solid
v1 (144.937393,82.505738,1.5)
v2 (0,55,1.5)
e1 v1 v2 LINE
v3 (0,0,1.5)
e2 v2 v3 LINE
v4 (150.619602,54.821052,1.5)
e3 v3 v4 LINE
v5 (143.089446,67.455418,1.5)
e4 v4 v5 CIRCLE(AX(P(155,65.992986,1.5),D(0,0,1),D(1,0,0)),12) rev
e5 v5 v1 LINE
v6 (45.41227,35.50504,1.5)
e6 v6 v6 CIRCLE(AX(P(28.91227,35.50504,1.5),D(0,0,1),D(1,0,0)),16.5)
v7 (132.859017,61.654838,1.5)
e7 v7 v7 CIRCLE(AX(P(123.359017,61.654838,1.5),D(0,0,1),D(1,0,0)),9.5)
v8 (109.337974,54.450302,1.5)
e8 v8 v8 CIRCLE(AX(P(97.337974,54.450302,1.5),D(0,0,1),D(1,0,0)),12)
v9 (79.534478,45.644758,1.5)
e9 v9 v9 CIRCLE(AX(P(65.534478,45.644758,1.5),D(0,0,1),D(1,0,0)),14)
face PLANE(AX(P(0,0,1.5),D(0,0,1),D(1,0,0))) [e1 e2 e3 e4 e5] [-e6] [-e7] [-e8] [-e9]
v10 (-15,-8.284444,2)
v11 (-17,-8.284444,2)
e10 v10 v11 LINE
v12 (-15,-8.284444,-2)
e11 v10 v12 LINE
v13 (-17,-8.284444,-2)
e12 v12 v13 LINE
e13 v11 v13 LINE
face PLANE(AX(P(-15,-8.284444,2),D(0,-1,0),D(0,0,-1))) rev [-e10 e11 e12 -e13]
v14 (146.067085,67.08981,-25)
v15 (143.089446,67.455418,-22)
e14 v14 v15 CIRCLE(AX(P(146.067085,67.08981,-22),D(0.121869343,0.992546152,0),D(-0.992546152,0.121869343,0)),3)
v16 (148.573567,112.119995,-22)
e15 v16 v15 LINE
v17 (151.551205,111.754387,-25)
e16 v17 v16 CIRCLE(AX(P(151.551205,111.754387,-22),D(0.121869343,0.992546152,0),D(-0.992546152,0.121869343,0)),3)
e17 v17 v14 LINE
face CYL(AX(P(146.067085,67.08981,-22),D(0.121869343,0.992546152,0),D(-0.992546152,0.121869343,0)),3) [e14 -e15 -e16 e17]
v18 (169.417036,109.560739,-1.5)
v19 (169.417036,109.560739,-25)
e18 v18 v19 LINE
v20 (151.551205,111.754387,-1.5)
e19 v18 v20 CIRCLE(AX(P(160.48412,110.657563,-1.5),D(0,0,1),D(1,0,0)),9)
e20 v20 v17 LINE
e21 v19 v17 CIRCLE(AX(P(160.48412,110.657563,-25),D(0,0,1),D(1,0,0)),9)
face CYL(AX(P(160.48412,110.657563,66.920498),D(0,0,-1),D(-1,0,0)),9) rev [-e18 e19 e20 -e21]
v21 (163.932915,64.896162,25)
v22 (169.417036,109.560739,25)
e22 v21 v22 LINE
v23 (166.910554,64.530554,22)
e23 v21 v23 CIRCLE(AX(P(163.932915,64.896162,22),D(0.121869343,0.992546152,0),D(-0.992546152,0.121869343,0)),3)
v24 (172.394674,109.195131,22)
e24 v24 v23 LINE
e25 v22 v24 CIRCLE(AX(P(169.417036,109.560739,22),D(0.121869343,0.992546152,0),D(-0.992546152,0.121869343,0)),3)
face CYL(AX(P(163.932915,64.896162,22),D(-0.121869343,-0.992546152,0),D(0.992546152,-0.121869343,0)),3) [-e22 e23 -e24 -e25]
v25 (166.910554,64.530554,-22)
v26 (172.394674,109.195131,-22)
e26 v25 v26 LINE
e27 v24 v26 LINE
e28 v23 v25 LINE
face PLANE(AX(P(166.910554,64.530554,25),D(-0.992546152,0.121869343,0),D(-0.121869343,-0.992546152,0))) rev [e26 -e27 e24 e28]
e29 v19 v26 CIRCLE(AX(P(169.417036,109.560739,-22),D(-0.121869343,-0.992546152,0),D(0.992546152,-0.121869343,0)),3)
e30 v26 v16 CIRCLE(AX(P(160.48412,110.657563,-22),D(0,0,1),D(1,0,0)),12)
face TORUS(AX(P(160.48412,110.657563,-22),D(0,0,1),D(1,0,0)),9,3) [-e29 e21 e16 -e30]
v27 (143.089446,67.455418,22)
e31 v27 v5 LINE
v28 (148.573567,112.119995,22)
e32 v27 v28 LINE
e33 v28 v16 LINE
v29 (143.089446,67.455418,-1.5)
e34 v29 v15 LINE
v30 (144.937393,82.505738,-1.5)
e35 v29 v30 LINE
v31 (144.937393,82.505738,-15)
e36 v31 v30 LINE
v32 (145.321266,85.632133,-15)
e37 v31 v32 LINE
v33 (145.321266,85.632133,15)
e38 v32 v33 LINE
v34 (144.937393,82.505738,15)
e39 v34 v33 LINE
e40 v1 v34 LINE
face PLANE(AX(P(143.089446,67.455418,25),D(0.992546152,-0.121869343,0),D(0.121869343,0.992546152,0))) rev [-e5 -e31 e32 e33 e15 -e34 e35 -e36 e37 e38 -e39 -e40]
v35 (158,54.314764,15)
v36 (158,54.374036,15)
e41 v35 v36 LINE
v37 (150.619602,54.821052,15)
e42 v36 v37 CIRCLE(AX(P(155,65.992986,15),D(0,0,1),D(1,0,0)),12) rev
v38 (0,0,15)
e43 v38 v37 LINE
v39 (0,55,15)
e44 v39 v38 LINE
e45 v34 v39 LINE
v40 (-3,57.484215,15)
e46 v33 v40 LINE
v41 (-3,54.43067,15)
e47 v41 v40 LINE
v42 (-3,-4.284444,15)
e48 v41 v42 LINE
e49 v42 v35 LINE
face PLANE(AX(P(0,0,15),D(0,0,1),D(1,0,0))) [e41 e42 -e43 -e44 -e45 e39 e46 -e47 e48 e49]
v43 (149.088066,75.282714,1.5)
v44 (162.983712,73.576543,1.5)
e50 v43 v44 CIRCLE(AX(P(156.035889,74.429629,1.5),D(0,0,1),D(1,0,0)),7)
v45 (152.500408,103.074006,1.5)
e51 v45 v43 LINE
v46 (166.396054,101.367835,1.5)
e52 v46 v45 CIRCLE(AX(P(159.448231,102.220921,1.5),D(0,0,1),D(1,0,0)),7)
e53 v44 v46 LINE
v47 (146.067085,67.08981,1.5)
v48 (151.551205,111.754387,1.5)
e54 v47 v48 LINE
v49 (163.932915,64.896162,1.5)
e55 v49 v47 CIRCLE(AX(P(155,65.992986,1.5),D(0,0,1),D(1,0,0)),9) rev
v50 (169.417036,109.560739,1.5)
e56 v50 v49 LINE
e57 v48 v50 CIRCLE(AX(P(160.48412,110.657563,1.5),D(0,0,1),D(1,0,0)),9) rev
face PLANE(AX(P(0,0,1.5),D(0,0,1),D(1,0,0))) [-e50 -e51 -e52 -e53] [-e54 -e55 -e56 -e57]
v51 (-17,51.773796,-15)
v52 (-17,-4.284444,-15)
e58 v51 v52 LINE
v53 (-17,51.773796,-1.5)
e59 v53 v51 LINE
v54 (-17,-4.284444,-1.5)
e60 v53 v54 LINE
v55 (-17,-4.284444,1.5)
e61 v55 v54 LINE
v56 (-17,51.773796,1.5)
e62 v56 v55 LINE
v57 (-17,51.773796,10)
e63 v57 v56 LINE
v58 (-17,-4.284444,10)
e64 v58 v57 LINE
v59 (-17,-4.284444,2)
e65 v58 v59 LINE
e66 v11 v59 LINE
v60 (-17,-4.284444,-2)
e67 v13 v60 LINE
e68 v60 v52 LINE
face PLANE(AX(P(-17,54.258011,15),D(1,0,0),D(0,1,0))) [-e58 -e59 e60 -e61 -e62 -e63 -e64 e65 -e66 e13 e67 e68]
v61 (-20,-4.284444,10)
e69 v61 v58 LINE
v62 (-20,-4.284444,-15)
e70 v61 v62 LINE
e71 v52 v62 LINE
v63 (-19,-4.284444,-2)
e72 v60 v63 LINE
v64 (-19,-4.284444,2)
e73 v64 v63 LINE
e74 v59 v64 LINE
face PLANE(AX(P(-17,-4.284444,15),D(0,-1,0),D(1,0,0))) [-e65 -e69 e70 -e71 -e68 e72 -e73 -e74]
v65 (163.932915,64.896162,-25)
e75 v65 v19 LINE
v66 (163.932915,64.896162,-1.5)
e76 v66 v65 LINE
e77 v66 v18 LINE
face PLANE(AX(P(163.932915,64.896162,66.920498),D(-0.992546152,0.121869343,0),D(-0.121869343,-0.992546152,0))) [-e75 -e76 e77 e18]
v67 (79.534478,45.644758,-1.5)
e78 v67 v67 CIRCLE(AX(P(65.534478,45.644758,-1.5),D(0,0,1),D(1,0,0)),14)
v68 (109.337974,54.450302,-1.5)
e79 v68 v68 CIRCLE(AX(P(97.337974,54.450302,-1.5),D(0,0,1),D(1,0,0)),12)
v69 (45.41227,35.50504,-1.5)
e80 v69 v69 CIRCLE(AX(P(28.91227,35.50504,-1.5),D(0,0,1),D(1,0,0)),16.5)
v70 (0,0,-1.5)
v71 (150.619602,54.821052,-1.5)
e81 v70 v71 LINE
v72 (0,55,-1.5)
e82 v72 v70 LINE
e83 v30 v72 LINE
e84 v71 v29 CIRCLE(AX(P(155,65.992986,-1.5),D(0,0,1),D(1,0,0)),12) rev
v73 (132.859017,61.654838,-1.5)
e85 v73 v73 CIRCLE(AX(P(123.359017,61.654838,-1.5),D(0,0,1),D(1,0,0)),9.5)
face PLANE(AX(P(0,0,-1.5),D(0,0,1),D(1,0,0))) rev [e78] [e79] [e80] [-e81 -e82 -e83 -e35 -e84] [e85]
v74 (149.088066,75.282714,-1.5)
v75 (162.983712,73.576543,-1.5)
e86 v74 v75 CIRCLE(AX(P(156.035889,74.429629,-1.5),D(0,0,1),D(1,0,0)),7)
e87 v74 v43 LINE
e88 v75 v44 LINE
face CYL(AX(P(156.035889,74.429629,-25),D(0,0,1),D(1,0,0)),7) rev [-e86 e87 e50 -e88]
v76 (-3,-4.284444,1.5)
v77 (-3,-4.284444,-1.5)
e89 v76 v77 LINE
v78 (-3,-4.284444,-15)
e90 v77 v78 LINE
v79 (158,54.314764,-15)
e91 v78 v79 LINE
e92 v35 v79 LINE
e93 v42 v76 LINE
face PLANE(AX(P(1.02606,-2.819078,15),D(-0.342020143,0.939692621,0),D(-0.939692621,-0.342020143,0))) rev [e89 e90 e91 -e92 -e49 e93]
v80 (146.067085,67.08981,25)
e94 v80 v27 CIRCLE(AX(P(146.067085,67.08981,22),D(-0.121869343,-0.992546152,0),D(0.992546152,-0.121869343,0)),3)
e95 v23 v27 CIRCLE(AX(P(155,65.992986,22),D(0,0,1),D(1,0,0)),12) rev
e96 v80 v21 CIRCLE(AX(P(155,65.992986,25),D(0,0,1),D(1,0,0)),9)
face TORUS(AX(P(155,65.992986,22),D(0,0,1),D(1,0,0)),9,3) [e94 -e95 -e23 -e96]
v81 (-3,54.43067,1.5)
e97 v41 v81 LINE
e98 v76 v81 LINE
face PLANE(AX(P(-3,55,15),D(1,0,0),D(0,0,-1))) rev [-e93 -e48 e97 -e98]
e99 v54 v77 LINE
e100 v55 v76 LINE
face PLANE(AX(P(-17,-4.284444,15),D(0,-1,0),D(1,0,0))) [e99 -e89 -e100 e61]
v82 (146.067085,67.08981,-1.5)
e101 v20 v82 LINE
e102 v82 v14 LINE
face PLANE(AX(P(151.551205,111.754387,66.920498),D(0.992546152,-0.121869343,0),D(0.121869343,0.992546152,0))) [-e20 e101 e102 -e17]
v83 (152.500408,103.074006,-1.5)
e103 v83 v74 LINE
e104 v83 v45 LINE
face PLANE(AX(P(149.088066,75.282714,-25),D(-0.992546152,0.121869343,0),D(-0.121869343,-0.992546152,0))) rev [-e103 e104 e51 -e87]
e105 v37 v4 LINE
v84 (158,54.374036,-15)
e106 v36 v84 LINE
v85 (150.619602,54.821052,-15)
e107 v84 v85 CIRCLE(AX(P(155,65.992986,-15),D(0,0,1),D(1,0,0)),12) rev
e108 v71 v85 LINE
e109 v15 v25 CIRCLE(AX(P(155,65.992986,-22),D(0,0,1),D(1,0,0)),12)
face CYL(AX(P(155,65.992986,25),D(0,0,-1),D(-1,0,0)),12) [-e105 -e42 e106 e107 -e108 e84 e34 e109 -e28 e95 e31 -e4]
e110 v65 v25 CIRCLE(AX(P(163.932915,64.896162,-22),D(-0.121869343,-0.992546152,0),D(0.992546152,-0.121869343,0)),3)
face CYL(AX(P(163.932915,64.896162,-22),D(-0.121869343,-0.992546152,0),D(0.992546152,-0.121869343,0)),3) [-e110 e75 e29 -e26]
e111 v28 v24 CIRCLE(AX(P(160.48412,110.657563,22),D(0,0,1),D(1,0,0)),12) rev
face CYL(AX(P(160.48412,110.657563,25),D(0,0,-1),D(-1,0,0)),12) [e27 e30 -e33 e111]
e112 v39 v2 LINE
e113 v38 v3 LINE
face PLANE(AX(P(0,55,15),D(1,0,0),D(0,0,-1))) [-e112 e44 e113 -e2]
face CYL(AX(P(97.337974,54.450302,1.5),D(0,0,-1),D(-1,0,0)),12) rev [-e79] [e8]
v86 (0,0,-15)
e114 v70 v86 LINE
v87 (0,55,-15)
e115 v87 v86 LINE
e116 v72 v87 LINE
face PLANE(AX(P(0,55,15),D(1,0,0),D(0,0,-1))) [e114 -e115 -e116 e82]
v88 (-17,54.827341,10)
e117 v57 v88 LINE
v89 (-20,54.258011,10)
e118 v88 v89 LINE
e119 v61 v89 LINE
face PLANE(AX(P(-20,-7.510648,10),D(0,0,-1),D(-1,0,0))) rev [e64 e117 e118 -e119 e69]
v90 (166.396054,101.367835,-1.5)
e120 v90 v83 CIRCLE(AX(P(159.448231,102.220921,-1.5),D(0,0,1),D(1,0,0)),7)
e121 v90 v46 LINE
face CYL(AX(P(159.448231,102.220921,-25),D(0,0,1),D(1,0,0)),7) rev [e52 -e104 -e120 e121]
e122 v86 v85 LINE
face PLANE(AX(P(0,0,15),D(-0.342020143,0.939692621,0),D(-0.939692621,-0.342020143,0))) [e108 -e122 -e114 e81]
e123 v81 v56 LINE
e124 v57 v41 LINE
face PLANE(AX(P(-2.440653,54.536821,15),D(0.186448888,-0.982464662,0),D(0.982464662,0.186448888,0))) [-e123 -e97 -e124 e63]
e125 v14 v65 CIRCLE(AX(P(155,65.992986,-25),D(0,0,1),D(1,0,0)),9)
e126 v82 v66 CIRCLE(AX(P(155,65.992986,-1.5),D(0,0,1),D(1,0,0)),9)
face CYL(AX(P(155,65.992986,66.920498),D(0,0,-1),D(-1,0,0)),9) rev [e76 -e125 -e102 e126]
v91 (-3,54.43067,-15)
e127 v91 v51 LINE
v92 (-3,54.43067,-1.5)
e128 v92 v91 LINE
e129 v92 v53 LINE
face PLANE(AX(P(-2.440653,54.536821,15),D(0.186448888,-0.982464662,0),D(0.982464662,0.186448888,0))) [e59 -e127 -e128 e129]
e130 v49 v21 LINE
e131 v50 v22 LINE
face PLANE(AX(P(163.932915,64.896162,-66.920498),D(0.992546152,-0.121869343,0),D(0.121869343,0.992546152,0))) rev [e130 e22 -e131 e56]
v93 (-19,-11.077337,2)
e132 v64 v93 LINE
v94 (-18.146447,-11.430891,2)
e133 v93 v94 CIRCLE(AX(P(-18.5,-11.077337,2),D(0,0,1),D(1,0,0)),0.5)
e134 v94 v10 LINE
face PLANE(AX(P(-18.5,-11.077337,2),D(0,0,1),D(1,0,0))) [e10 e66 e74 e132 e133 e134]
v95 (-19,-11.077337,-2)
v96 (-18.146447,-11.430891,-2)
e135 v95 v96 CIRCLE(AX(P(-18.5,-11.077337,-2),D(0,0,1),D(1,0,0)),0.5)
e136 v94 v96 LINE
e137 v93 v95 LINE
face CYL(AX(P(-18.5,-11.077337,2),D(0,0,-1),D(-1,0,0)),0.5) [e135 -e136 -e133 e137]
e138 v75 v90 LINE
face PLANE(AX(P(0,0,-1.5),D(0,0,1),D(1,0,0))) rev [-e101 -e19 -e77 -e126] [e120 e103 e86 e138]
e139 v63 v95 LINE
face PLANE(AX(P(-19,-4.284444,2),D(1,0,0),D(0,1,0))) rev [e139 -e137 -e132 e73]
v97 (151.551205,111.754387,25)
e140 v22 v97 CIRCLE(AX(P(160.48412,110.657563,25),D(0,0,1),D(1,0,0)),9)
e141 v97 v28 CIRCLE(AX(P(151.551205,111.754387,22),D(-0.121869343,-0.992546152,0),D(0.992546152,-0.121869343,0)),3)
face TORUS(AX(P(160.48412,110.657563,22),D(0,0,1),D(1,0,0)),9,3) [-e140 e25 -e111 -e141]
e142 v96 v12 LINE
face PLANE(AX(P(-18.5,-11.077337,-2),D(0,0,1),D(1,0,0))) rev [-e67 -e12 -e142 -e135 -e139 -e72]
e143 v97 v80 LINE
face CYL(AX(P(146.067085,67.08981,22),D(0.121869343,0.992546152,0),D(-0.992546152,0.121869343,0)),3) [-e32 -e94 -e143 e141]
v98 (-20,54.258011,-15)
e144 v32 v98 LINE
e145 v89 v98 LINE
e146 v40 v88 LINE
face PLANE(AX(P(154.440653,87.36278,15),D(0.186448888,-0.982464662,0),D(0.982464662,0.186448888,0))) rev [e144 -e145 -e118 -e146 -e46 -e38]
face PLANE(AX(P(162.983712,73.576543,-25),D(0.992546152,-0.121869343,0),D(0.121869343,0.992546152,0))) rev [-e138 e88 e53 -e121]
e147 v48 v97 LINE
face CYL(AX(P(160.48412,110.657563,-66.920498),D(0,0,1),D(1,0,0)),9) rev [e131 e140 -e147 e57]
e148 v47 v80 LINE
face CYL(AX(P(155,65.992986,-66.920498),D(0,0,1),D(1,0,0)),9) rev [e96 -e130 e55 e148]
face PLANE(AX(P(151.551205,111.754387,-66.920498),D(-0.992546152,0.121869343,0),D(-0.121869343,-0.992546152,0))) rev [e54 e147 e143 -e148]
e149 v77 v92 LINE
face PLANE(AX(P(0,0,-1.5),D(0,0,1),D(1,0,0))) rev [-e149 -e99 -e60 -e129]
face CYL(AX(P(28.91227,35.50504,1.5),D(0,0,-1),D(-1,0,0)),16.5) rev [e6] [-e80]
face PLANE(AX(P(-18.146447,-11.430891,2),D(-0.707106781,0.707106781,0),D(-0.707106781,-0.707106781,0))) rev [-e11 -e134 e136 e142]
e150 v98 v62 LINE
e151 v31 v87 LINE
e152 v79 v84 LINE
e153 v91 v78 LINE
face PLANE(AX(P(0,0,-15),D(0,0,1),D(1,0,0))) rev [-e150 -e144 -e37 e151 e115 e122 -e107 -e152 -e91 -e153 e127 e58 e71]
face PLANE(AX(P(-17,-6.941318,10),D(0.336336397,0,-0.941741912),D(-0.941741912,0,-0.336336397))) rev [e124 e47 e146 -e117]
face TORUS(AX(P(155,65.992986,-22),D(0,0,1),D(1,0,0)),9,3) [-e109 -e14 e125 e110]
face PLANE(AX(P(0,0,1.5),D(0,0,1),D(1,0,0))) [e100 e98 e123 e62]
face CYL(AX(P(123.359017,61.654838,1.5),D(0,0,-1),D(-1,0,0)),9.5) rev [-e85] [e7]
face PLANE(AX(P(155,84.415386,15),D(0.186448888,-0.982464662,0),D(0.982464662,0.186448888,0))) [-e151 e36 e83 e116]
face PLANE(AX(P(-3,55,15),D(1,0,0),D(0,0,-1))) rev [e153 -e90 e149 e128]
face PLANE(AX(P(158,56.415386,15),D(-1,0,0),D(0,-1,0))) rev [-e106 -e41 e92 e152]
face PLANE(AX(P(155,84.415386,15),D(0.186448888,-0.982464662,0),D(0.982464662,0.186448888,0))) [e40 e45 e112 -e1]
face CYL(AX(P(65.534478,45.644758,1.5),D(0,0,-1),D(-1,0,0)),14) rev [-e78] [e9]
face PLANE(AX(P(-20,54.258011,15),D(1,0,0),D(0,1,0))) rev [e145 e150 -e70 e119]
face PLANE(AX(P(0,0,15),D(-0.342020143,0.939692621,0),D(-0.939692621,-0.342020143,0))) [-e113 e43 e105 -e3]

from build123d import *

# Parameters (mm, degrees)
SCHIZZO1_R                    = 16.5
SCHIZZO1_R_2                  = 14
SCHIZZO1_R_3                  = 12
SCHIZZO1_R_4                  = 9.5
ESTRUSIONE_ESTRUSIONE1_DEPTH  = 1.5
ESTRUSIONE_SOTTILE4_DEPTH     = 15
ESTRUSIONE_ESTRUSIONE2_DEPTH  = 25
TAGLIO_ESTRUSIONE1_DEPTH      = 23.5
TAGLIO_ESTRUSIONE2_DEPTH      = 214.121208684
TAGLIO_ESTRUSIONE2_DEPTH_BACK = 214.121208684
ESTRUSIONE_SOTTILE5_DEPTH     = 15
ESTRUSIONE_ESTRUSIONE3_DEPTH  = 1.5
TAGLIO_ESTRUSIONE4_START      = -4.28444402
TAGLIO_ESTRUSIONE4_DEPTH      = 61.768658905
ESTRUSIONE_ESTRUSIONE5_DEPTH  = 2
RACCORDO4_R                   = 3
RACCORDO5_R                   = 3


# Read off the part's stored shape, not the designer's step: Taglio-Estrusione4
with BuildPart() as part:
    # Schizzo1 → Estrusione-Estrusione1 (new, symmetric)
    with BuildSketch(Plane.XY):
        Polygon((0, 55), (0, 0), (155, 56.415386311), (155, 84.415386311), align=None)
        with Locations((28.912269587, 35.505040119)):
            Circle(SCHIZZO1_R, mode=Mode.SUBTRACT)
        with Locations((65.534477731, 45.644757604)):
            Circle(SCHIZZO1_R_2, mode=Mode.SUBTRACT)
        with Locations((97.337974277, 54.450301735)):
            Circle(SCHIZZO1_R_3, mode=Mode.SUBTRACT)
        with Locations((123.359016906, 61.654837842)):
            Circle(SCHIZZO1_R_4, mode=Mode.SUBTRACT)
    extrude(amount=ESTRUSIONE_ESTRUSIONE1_DEPTH, both=True)

    # Schizzo5 → Estrusione-Sottile4 (add, symmetric)
    with BuildSketch(Plane.XY):
        Polygon((158, 88.038261311), (-3, 57.484214885), (-3, -4.28444402), (158, 54.314763697), align=None)
        Polygon((155, 84.415386311), (0, 55), (0, 0), (155, 56.415386311), align=None, mode=Mode.SUBTRACT)
    extrude(amount=ESTRUSIONE_SOTTILE4_DEPTH, both=True)

    # Schizzo6 → Estrusione-Estrusione2 (add, symmetric)
    with BuildSketch(Plane.XY):
        with BuildLine():
            Line((143.08944618, 67.455418384), (148.573566634, 112.119995208))
            ThreePointArc((148.573566634, 112.119995208), (161.946552574, 122.568116907), (172.394674273, 109.195130967))
            Line((172.394674273, 109.195130967), (166.91055382, 64.530554143))
            ThreePointArc((166.91055382, 64.530554143), (153.537567879, 54.082432444), (143.08944618, 67.455418384))
        make_face()
    extrude(amount=ESTRUSIONE_ESTRUSIONE2_DEPTH, both=True)

    # Schizzo7 → Taglio-Estrusione1 (cut)
    with BuildSketch(Plane.XY.offset(25)):
        with BuildLine():
            Line((163.932915365, 64.896162173), (169.417035818, 109.560738997))
            ThreePointArc((169.417035818, 109.560738997), (161.580944544, 119.590478452), (151.551205088, 111.754387178))
            Line((151.551205088, 111.754387178), (146.067084635, 67.089810354))
            ThreePointArc((146.067084635, 67.089810354), (153.903175909, 57.060070899), (163.932915365, 64.896162173))
        make_face()
    taglio_estrusione1 = extrude(amount=-TAGLIO_ESTRUSIONE1_DEPTH, mode=Mode.SUBTRACT)

    # Specchia1: Taglio-Estrusione1 across plane
    add(taglio_estrusione1.mirror(Plane.XY), mode=Mode.SUBTRACT)

    # Schizzo8 → Taglio-Estrusione2 (cut, two sides: drawn at the far end of the back side and taken through both)
    with BuildSketch(Plane.XY.offset(-TAGLIO_ESTRUSIONE2_DEPTH_BACK)):
        with BuildLine():
            Line((149.088066357, 75.282713956), (152.500407973, 103.074006202))
            ThreePointArc((152.500407973, 103.074006202), (160.301316438, 109.16874386), (166.396054096, 101.367835395))
            Line((166.396054096, 101.367835395), (162.98371248, 73.576543149))
            ThreePointArc((162.98371248, 73.576543149), (155.182804015, 67.481805491), (149.088066357, 75.282713956))
        make_face()
    extrude(amount=TAGLIO_ESTRUSIONE2_DEPTH + TAGLIO_ESTRUSIONE2_DEPTH_BACK, mode=Mode.SUBTRACT)

    # Schizzo9 → Estrusione-Sottile5 (add, symmetric)
    with BuildSketch(Plane.XY):
        Polygon((-3, 57.484214885), (-20, 54.258011225), (-20, -4.28444402), (-17, -4.28444402), (-17, 51.77379634), (-2.440653337, 54.536820898), align=None)
    extrude(amount=ESTRUSIONE_SOTTILE5_DEPTH, both=True)

    # Schizzo12 → Estrusione-Estrusione3 (add, symmetric)
    with BuildSketch(Plane.XY):
        Polygon((-17, 51.77379634), (-17, -4.28444402), (-3, -4.28444402), (-3, 54.430669942), align=None)
    extrude(amount=ESTRUSIONE_ESTRUSIONE3_DEPTH, both=True)

    # Taglio-Estrusione4 outline → Taglio-Estrusione4 (cut)
    with BuildSketch(Plane(origin=(0, 0, 0), x_dir=(1, 0, 0), z_dir=(0, 1, 0)).offset(TAGLIO_ESTRUSIONE4_START)):
        Polygon((-3, -15), (-17, -10), (-20, -10), (-20, -15), align=None)
    extrude(amount=TAGLIO_ESTRUSIONE4_DEPTH, mode=Mode.SUBTRACT)

    # Schizzo22 → Estrusione-Estrusione5 (add, symmetric)
    with BuildSketch(Plane.XY):
        with BuildLine():
            Line((-19, -4.28444402), (-19, -11.077337239))
            ThreePointArc((-19, -11.077337239), (-18.691341716, -11.539277005), (-18.146446609, -11.43089063))
            Line((-18.146446609, -11.43089063), (-15, -8.28444402))
            Line((-15, -8.28444402), (-17, -8.28444402))
            Line((-17, -8.28444402), (-17, -4.28444402))
            Line((-17, -4.28444402), (-19, -4.28444402))
        make_face()
    extrude(amount=ESTRUSIONE_ESTRUSIONE5_DEPTH, both=True)

    # Raccordo4
    raccordo4_edges = [part.edges().sort_by_distance(p)[0] for p in [
        (153.537567879, 54.082432444, 25),
        (169.652614046, 86.862842555, 25),
        (161.946552574, 122.568116907, 25),
        (145.831506407, 89.787706796, 25),
    ]]
    fillet(raccordo4_edges, radius=RACCORDO4_R - 0.0001)  # a hair under: the kernel refuses the full size

    # Raccordo5
    raccordo5_edges = [part.edges().sort_by_distance(p)[0] for p in [
        (145.831506407, 89.787706796, -25),
        (153.537567879, 54.082432444, -25),
        (169.652614046, 86.862842555, -25),
        (161.946552574, 122.568116907, -25),
    ]]
    fillet(raccordo5_edges, radius=RACCORDO5_R - 0.0001)  # a hair under: the kernel refuses the full size


solid = part.part
